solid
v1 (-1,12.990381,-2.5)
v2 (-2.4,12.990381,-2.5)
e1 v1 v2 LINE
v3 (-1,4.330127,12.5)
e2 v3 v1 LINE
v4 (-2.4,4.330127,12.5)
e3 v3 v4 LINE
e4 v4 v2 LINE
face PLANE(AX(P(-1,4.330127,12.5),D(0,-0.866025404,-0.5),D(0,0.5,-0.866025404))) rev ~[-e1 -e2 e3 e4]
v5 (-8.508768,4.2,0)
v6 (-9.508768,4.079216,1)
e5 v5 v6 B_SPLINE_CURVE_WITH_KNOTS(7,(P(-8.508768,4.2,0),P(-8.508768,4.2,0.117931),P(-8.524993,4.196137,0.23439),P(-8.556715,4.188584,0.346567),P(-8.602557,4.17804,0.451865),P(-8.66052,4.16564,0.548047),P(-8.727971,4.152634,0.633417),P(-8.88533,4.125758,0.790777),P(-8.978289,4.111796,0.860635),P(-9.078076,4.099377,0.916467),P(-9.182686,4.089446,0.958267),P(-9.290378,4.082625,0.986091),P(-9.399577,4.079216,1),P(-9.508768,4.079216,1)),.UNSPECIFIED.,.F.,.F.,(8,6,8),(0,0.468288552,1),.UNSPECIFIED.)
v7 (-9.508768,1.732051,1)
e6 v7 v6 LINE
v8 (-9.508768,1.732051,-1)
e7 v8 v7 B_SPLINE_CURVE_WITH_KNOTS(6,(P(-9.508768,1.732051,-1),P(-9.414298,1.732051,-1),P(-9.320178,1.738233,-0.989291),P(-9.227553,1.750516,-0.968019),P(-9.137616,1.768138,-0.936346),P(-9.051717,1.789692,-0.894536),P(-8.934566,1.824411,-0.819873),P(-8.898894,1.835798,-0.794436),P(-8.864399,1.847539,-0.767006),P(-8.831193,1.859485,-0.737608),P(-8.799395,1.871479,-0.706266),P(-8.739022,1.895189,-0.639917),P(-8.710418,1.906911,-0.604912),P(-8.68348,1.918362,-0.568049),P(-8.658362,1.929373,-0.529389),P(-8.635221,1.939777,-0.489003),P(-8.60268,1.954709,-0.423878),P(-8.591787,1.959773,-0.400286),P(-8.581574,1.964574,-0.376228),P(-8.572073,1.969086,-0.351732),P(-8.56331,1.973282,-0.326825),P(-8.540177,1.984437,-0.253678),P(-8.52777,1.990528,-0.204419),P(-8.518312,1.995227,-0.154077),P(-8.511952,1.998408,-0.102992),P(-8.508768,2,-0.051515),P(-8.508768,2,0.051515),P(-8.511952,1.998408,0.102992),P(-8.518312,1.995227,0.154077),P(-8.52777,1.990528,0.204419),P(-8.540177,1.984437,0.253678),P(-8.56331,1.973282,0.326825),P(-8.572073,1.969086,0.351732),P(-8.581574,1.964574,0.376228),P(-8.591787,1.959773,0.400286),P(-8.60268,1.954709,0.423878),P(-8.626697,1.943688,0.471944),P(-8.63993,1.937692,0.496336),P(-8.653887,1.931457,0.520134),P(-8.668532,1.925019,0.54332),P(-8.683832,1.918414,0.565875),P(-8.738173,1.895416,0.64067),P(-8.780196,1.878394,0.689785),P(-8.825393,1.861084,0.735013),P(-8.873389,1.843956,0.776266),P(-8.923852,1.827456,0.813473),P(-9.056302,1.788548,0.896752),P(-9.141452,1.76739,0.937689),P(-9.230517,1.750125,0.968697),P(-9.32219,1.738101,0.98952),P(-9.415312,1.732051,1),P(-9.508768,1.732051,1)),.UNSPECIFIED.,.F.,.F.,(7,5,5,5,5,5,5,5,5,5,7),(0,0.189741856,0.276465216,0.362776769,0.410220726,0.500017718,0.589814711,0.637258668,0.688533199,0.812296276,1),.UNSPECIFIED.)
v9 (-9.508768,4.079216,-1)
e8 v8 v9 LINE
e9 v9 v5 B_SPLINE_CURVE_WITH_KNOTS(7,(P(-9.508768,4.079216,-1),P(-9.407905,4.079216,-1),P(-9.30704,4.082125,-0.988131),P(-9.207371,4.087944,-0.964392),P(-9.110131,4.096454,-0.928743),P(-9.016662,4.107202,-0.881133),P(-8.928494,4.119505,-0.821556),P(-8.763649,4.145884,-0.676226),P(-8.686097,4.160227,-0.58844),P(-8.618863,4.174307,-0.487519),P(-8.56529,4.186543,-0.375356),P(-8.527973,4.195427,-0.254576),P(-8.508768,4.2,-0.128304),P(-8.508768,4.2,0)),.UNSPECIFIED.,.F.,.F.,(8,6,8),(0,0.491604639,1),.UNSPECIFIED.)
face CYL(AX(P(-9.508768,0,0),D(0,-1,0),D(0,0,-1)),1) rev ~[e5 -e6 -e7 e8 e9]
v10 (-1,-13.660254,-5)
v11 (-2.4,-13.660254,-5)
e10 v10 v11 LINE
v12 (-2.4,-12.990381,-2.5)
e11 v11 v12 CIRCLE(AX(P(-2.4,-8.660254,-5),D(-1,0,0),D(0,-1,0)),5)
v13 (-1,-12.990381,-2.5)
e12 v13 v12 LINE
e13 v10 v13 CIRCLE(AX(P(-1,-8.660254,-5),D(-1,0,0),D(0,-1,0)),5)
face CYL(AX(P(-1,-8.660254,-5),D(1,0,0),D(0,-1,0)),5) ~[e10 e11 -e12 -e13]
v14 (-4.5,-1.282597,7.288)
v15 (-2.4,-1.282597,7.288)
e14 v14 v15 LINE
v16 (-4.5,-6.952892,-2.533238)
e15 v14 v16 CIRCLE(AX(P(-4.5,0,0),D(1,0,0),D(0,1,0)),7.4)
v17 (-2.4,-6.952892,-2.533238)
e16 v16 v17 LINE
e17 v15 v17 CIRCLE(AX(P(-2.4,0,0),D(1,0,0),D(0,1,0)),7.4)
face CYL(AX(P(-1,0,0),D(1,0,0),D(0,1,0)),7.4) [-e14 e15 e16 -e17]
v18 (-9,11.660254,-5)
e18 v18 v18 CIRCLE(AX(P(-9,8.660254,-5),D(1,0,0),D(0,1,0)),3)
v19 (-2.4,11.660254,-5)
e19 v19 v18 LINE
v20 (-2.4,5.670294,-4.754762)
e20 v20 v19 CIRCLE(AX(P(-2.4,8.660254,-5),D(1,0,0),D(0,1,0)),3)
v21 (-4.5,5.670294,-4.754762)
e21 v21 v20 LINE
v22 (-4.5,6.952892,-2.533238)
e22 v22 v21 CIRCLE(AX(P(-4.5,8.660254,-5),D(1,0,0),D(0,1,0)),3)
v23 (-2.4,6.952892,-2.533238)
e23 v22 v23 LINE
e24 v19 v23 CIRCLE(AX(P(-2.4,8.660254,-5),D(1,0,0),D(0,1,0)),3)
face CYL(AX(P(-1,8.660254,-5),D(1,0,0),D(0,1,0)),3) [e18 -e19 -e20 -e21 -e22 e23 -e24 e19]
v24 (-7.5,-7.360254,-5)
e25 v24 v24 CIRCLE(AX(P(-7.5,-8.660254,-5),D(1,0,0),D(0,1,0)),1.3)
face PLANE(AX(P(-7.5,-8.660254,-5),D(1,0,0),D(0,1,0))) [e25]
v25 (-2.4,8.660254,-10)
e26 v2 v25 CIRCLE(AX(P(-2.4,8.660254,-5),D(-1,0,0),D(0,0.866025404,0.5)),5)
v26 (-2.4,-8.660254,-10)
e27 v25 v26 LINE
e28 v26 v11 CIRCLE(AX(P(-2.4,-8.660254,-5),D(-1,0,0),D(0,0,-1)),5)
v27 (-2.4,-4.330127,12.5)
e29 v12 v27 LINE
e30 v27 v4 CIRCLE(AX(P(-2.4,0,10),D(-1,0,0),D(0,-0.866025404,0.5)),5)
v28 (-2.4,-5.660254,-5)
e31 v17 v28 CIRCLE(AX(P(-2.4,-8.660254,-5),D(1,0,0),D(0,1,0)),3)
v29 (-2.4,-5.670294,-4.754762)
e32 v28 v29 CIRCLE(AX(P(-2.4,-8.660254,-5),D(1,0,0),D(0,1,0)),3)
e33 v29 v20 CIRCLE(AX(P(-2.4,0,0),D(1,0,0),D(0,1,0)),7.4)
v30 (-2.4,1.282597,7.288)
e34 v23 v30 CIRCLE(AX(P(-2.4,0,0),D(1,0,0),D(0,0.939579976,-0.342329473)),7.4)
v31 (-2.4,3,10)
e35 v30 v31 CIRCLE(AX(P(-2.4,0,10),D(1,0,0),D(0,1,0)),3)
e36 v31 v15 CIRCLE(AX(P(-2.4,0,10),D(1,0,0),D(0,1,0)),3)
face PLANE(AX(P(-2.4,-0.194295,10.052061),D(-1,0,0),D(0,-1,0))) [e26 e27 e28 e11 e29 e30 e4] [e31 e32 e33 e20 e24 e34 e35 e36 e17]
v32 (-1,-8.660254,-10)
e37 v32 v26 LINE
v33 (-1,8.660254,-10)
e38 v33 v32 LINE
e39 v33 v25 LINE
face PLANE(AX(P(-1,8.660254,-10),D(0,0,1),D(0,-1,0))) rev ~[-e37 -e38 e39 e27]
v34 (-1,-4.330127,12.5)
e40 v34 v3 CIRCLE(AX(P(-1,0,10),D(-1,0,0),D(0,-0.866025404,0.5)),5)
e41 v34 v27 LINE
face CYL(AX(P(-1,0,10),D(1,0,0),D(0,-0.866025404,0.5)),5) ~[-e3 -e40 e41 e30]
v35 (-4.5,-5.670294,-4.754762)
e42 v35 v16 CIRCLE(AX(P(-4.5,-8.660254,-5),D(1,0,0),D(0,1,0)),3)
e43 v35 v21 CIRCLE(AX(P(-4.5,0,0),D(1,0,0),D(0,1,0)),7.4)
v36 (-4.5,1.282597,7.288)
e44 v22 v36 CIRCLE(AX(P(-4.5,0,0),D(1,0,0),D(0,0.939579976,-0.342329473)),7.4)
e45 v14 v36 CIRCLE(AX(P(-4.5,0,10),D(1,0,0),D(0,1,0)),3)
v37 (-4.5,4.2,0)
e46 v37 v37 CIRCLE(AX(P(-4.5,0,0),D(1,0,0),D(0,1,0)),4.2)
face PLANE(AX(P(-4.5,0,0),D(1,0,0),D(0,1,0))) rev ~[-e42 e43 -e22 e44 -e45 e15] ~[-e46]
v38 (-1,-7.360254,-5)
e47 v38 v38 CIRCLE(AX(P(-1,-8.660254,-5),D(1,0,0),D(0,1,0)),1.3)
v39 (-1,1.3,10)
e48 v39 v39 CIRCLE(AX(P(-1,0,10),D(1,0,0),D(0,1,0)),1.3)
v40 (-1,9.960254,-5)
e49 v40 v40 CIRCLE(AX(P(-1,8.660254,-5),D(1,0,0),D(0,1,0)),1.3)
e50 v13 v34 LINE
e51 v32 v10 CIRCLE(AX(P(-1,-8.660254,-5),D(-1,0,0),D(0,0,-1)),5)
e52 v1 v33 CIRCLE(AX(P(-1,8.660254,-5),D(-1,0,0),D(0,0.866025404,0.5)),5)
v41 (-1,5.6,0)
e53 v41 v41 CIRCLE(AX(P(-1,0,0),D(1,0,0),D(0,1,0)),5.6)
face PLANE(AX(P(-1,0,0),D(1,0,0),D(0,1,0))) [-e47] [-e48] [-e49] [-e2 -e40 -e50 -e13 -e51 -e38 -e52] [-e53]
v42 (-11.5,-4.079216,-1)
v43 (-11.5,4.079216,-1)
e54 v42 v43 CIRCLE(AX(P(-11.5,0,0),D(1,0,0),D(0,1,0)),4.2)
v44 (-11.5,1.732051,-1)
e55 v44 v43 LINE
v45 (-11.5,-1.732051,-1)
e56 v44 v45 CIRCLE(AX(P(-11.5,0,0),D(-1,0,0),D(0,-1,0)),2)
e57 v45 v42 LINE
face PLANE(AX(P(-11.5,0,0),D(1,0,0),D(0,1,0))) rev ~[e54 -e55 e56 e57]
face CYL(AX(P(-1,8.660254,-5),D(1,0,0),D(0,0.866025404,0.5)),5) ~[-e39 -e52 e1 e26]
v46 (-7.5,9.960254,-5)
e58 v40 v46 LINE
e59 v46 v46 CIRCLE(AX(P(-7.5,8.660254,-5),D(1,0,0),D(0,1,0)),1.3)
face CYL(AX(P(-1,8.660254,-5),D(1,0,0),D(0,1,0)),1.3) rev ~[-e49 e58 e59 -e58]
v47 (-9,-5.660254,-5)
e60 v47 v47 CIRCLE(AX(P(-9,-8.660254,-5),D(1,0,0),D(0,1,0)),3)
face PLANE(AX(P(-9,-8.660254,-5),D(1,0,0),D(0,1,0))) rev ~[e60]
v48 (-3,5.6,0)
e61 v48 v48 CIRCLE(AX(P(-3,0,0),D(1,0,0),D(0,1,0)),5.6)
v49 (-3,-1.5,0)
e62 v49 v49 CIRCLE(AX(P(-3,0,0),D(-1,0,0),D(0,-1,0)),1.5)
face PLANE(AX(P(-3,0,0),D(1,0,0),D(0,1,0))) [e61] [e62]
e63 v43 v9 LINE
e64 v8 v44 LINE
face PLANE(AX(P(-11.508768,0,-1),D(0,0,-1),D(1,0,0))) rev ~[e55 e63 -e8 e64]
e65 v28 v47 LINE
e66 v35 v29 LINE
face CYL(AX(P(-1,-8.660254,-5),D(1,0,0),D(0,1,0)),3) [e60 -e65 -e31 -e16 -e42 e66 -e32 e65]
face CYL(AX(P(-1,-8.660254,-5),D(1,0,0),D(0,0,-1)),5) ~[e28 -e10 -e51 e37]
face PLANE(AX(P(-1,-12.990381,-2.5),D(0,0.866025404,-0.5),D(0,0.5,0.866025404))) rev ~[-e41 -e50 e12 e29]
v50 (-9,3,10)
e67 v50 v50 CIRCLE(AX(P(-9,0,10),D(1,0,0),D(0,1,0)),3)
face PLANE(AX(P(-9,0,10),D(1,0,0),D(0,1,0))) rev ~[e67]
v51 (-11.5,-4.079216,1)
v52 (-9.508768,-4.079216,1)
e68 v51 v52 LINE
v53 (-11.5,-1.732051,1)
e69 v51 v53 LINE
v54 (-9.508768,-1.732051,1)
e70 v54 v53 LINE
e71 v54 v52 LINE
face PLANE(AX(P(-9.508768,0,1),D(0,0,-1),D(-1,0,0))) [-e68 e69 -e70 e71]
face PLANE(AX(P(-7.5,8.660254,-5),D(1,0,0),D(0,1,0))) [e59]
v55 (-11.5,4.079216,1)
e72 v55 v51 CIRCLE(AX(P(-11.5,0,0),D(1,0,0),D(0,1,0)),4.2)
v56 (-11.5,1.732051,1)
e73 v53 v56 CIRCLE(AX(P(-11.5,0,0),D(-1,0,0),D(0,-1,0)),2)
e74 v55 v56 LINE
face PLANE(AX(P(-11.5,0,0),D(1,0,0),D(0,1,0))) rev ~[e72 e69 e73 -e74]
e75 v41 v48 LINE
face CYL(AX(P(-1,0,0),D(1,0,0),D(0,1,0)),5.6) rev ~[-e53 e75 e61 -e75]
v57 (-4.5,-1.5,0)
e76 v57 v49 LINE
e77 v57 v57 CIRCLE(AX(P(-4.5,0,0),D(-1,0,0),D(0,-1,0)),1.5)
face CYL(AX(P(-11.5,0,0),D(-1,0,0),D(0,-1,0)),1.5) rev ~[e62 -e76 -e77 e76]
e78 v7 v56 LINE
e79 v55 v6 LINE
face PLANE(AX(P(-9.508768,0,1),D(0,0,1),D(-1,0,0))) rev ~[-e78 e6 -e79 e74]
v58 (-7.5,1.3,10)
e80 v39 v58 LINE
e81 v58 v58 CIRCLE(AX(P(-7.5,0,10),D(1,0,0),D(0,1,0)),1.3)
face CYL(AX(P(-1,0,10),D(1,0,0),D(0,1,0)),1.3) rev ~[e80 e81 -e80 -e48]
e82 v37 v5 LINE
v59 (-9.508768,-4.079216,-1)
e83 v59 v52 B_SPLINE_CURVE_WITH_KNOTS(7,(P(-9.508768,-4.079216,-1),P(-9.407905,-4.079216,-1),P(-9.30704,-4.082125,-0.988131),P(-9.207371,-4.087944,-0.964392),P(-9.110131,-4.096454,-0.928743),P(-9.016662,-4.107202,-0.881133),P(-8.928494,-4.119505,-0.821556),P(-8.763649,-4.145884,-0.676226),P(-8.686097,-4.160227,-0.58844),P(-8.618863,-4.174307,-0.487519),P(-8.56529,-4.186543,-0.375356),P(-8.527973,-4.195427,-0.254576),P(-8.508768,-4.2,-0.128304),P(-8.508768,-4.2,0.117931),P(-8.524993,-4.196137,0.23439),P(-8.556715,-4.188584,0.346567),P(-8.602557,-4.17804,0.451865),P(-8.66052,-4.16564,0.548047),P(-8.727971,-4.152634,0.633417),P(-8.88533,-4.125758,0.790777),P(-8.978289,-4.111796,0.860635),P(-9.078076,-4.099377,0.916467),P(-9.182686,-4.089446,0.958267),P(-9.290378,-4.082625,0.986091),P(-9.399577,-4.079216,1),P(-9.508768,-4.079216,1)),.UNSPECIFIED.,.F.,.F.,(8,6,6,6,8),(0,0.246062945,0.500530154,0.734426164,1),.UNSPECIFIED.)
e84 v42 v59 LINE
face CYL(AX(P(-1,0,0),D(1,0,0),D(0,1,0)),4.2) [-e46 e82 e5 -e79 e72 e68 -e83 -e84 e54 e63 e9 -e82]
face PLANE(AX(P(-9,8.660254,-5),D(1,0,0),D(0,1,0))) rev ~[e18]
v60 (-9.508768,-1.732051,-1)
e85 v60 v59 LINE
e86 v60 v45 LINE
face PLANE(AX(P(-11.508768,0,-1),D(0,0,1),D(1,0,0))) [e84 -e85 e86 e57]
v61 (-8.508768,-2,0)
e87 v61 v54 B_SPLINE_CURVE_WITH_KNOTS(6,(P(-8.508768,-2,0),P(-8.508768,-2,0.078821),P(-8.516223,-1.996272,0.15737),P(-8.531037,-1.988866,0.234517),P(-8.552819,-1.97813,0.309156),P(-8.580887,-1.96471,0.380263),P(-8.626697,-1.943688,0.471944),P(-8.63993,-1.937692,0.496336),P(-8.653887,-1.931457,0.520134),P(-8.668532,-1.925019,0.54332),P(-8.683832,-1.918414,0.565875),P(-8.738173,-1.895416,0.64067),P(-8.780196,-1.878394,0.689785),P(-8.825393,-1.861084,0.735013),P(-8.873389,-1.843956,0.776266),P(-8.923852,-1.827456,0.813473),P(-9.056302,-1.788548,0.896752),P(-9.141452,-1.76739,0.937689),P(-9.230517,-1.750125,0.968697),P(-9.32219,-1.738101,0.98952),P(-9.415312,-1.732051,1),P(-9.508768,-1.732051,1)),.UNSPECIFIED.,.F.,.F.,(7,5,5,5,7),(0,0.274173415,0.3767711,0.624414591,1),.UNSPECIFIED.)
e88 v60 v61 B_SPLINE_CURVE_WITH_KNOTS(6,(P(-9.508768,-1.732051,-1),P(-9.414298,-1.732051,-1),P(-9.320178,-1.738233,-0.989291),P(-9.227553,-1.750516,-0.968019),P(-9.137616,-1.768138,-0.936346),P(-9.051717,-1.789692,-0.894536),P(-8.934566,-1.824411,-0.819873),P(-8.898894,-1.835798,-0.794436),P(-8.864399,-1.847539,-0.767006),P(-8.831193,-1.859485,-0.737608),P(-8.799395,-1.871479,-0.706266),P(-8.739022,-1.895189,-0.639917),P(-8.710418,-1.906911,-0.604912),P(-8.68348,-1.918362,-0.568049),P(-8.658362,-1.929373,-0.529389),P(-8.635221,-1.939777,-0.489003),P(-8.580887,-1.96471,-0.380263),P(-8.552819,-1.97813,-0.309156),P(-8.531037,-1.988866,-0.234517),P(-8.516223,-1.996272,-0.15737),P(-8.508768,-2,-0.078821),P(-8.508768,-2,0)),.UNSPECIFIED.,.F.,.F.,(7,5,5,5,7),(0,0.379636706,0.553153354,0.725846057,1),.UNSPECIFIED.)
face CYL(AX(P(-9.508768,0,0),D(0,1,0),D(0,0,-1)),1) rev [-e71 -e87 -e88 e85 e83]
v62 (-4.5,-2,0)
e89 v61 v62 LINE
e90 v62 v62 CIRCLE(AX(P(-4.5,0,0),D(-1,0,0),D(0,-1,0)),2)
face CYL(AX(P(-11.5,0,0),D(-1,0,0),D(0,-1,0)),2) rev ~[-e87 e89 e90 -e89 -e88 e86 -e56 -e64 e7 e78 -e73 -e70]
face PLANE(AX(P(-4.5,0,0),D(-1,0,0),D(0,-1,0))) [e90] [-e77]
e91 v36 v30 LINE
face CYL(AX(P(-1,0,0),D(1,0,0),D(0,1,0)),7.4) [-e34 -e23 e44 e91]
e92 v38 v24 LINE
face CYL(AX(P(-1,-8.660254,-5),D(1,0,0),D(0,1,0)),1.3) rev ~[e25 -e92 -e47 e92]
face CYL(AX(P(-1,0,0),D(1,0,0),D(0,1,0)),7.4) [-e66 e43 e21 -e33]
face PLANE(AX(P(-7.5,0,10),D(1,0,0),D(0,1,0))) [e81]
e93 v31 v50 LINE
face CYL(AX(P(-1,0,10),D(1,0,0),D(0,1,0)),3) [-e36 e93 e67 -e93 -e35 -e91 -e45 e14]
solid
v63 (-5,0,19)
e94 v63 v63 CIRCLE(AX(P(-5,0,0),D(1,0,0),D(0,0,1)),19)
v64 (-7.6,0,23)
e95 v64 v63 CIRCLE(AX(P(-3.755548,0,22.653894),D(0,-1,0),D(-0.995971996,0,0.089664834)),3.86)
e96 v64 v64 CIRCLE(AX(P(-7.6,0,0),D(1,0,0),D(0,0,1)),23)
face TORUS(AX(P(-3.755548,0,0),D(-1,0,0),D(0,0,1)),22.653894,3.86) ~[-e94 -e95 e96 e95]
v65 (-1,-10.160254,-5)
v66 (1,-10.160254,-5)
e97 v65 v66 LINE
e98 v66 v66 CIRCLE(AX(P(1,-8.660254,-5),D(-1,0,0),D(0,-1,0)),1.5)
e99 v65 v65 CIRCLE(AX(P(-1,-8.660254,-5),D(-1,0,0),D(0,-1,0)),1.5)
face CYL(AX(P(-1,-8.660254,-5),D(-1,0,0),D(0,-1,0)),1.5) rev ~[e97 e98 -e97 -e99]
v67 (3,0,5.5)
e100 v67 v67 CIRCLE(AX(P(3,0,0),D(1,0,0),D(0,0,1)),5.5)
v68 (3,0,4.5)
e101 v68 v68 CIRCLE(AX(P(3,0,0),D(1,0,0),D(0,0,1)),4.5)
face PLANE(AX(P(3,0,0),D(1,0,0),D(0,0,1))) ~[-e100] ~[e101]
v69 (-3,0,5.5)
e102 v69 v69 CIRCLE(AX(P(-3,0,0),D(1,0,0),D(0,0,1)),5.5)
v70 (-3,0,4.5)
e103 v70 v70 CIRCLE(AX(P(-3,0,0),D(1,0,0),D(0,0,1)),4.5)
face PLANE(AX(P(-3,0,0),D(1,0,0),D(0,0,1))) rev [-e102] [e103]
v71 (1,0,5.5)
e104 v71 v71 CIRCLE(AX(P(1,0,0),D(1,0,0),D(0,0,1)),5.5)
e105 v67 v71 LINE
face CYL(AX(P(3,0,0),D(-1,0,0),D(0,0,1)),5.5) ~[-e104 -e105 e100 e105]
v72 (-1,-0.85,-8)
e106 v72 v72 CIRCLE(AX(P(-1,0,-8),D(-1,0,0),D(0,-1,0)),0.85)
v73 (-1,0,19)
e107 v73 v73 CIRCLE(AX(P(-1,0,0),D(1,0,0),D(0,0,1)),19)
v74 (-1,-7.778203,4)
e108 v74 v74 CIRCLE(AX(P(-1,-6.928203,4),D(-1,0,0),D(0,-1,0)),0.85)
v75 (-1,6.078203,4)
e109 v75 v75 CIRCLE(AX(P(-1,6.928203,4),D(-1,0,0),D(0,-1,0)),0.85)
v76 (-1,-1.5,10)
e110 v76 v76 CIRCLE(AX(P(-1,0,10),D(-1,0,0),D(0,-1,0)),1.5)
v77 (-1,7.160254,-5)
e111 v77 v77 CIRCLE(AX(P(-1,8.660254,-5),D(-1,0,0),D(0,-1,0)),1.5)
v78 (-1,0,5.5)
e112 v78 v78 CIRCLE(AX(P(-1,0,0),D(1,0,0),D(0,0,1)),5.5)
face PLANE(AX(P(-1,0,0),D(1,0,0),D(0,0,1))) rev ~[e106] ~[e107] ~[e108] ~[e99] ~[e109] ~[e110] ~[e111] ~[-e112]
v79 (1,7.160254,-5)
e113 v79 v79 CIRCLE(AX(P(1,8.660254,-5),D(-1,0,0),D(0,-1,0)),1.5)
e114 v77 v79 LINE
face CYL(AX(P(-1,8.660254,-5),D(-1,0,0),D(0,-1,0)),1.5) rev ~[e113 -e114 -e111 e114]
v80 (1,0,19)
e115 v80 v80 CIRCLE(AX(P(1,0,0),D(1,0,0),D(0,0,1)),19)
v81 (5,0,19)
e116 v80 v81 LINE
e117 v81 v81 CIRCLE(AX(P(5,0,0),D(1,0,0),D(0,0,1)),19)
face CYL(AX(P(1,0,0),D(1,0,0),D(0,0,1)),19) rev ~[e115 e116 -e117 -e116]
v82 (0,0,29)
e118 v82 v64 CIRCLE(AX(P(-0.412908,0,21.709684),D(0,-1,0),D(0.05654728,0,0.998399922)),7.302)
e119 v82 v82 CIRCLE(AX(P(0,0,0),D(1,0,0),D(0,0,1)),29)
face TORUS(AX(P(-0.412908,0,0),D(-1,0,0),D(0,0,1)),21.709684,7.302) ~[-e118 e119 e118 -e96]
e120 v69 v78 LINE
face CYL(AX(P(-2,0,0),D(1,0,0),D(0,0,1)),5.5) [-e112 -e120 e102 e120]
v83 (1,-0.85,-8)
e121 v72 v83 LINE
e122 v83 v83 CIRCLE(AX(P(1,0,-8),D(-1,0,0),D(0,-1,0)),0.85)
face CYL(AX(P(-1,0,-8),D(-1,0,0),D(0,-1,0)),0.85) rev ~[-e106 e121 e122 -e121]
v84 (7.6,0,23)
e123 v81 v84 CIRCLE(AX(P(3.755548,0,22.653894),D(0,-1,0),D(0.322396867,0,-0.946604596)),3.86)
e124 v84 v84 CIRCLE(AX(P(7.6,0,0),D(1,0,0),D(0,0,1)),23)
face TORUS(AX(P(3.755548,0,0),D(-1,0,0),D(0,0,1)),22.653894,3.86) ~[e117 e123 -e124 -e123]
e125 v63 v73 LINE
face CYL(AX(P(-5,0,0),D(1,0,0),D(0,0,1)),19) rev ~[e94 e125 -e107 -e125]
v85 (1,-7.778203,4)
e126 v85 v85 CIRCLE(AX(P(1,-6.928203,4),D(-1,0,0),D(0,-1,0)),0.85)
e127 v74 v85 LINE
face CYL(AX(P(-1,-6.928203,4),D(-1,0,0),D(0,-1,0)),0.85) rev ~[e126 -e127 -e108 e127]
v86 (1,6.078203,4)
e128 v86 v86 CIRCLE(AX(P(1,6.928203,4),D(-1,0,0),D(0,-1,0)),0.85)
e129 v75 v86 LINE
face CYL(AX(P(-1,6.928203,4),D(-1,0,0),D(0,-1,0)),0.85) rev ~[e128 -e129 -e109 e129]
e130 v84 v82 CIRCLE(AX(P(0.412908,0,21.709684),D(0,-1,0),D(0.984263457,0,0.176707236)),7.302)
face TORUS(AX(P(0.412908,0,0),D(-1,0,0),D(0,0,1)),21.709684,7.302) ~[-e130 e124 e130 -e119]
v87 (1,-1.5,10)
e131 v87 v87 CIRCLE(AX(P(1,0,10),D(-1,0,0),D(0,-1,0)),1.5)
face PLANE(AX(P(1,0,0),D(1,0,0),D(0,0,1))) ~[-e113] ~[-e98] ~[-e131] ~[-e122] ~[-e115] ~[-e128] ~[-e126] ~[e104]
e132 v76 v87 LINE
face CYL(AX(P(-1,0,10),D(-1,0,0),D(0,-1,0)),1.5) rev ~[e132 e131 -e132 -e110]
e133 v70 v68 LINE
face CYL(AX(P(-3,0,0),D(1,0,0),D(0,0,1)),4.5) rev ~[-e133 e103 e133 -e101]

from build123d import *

# Parameters (mm, degrees)
F0_W           = 1
F0_H           = 1
F0_W_2         = 2
F0_H_2         = 13.5
F3_R           = 1.5
F3_R_2         = 0.85
F4_DEPTH       = 8.6165481942
F6_DEPTH       = 1.4
F7_R           = 3
F8_DEPTH       = 8
F9_R           = 4.2
F10_DEPTH      = 10.5
F11_R          = 7.4
F12_DEPTH      = 3.5
F13_R          = 5.6
F14_DEPTH      = 2
F15_R          = 1.5
F16_DEPTH      = 19.1165481942
F17_R          = 2
F18_DEPTH      = 7
F19_R          = 1.3
F20_DEPTH      = 6.5
F22_DEPTH      = 25
F22_DEPTH_BACK = 25


with BuildPart() as f2:
    # F0 (on Front) → F2 (revolve)
    with BuildSketch(Plane.XZ):
        with Locations((0.5, 5)):
            Rectangle(F0_W, F0_H)
        with Locations((-0.5, 5)):
            Rectangle(F0_W, F0_H)
        with Locations((2, 5)):
            Rectangle(F0_W_2, F0_H)
        with Locations((-0.5, 12.25)):
            Rectangle(F0_W, F0_H_2)
        with Locations((0.5, 12.25)):
            Rectangle(F0_W, F0_H_2)
        with Locations((-2, 5)):
            Rectangle(F0_W_2, F0_H)
        Polygon((0, 23), (0, 19), (1, 19), (5, 19), (5, 23), align=None)
        Polygon((-1, 19), (0, 19), (0, 23), (-5, 23), (-5, 19), align=None)
        with BuildLine():
            Line((-5, 23), (0, 23))
            Line((0, 23), (5, 23))
            Line((5, 23), (5, 19))
            ThreePointArc((5, 19), (6.9919404531, 20.5502387055), (7.6, 23))
            ThreePointArc((7.6, 23), (4.9375508317, 27.4408977202), (0, 29))
            ThreePointArc((0, 29), (-4.9375508317, 27.4408977202), (-7.6, 23))
            ThreePointArc((-7.6, 23), (-6.9919404531, 20.5502387055), (-5, 19))
            Line((-5, 19), (-5, 23))
        make_face()
    revolve(axis=Axis((4.0732044727, 0, 0), (1, 0, 0)))

    # F3 (on face) → F4 (cut, through all)
    with BuildSketch(Plane(origin=(-1, 0, 0), x_dir=(0, -1, 0), z_dir=(-1, 0, 0))):
        with Locations((0, 10)):
            Circle(F3_R)
        with Locations((-8.6602540378, -5)):
            Circle(F3_R)
        with Locations((8.6602540378, -5)):
            Circle(F3_R)
        with Locations((0, -8)):
            Circle(F3_R_2)
        with Locations((6.9282032303, 4)):
            Circle(F3_R_2)
        with Locations((-6.9282032303, 4)):
            Circle(F3_R_2)
    extrude(amount=-F4_DEPTH, mode=Mode.SUBTRACT)


with BuildPart() as f6:
    # F5 (on face) → F6 (new body)
    with BuildSketch(Plane(origin=(-1, 0, 0), x_dir=(0, -1, 0), z_dir=(-1, 0, 0))):
        with BuildLine():
            ThreePointArc((-4.3301270189, 12.5), (-1.2940952255, 5.1703708686), (5, 10))
            ThreePointArc((5, 10), (4.8296291314, 11.2940952255), (4.3301270189, 12.5))
            ThreePointArc((4.3301270189, 12.5), (0, 15), (-4.3301270189, 12.5))
        make_face()
        with BuildLine():
            ThreePointArc((4.3301270189, 12.5), (4.8296291314, 11.2940952255), (5, 10))
            ThreePointArc((5, 10), (-1.2940952255, 5.1703708686), (-4.3301270189, 12.5))
            Line((-4.3301270189, 12.5), (-12.9903810568, -2.5))
            ThreePointArc((-12.9903810568, -2.5), (-7.3661588123, -0.1703708686), (-3.6602540378, -5))
            ThreePointArc((-3.6602540378, -5), (-5.1247201319, -8.5355339059), (-8.6602540378, -10))
            Line((-8.6602540378, -10), (8.6602540378, -10))
            ThreePointArc((8.6602540378, -10), (4.3301270189, -2.5), (12.9903810568, -2.5))
            Line((12.9903810568, -2.5), (4.3301270189, 12.5))
        make_face()
        with BuildLine():
            ThreePointArc((13.6602540378, -5), (13.4898831693, -3.7059047745), (12.9903810568, -2.5))
            ThreePointArc((12.9903810568, -2.5), (4.3301270189, -2.5), (8.6602540378, -10))
            ThreePointArc((8.6602540378, -10), (12.1957879438, -8.5355339059), (13.6602540378, -5))
        make_face()
        with BuildLine():
            ThreePointArc((-3.6602540378, -5), (-7.3661588123, -0.1703708686), (-12.9903810568, -2.5))
            ThreePointArc((-12.9903810568, -2.5), (-12.9903810568, -7.5), (-8.6602540378, -10))
            ThreePointArc((-8.6602540378, -10), (-5.1247201319, -8.5355339059), (-3.6602540378, -5))
        make_face()
    extrude(amount=F6_DEPTH)

    # F7 (on face) → F8 (join)
    with BuildSketch(Plane.YZ.offset(-1)):
        with Locations((0, 10)):
            Circle(F7_R)
        with Locations((-8.6602540378, -5)):
            Circle(F7_R)
        with Locations((8.6602540378, -5)):
            Circle(F7_R)
    extrude(amount=-F8_DEPTH)

    # F9 (on face) → F10 (join)
    with BuildSketch(Plane.YZ.offset(-1)):
        Circle(F9_R)
    extrude(amount=-F10_DEPTH)

    # F11 (on face) → F12 (join)
    with BuildSketch(Plane.YZ.offset(-1)):
        Circle(F11_R)
    extrude(amount=-F12_DEPTH)

    # F13 (on face) → F14 (cut)
    with BuildSketch(Plane.YZ.offset(-1)):
        Circle(F13_R)
    extrude(amount=-F14_DEPTH, mode=Mode.SUBTRACT)

    # F15 (on face) → F16 (cut, through all)
    with BuildSketch(Plane(origin=(-11.5, 0, 0), x_dir=(0, -1, 0), z_dir=(-1, 0, 0))):
        Circle(F15_R)
    extrude(amount=-F16_DEPTH, mode=Mode.SUBTRACT)

    # F17 (on face) → F18 (cut)
    with BuildSketch(Plane(origin=(-11.5, 0, 0), x_dir=(0, -1, 0), z_dir=(-1, 0, 0))):
        Circle(F17_R)
    extrude(amount=-F18_DEPTH, mode=Mode.SUBTRACT)

    # F19 (on face) → F20 (cut)
    with BuildSketch(Plane.YZ.offset(-1)):
        with Locations((0, 10)):
            Circle(F19_R)
        with Locations((-8.6602540378, -5)):
            Circle(F19_R)
        with Locations((8.6602540378, -5)):
            Circle(F19_R)
    extrude(amount=-F20_DEPTH, mode=Mode.SUBTRACT)

    # F21 (on Front) → F22 (cut, two sides)
    with BuildSketch(Plane.XZ) as f22_sk:
        with BuildLine():
            Line((-11.5087675167, 1), (-11.5087675167, -1))
            Line((-11.5087675167, -1), (-9.5087675167, -1))
            ThreePointArc((-9.5087675167, -1), (-8.5087675167, 0), (-9.5087675167, 1))
            Line((-9.5087675167, 1), (-11.5087675167, 1))
        make_face()
    extrude(amount=-F22_DEPTH, mode=Mode.SUBTRACT)
    extrude(f22_sk.sketch, amount=F22_DEPTH_BACK, mode=Mode.SUBTRACT)


solid = Compound([f2.part, f6.part])
